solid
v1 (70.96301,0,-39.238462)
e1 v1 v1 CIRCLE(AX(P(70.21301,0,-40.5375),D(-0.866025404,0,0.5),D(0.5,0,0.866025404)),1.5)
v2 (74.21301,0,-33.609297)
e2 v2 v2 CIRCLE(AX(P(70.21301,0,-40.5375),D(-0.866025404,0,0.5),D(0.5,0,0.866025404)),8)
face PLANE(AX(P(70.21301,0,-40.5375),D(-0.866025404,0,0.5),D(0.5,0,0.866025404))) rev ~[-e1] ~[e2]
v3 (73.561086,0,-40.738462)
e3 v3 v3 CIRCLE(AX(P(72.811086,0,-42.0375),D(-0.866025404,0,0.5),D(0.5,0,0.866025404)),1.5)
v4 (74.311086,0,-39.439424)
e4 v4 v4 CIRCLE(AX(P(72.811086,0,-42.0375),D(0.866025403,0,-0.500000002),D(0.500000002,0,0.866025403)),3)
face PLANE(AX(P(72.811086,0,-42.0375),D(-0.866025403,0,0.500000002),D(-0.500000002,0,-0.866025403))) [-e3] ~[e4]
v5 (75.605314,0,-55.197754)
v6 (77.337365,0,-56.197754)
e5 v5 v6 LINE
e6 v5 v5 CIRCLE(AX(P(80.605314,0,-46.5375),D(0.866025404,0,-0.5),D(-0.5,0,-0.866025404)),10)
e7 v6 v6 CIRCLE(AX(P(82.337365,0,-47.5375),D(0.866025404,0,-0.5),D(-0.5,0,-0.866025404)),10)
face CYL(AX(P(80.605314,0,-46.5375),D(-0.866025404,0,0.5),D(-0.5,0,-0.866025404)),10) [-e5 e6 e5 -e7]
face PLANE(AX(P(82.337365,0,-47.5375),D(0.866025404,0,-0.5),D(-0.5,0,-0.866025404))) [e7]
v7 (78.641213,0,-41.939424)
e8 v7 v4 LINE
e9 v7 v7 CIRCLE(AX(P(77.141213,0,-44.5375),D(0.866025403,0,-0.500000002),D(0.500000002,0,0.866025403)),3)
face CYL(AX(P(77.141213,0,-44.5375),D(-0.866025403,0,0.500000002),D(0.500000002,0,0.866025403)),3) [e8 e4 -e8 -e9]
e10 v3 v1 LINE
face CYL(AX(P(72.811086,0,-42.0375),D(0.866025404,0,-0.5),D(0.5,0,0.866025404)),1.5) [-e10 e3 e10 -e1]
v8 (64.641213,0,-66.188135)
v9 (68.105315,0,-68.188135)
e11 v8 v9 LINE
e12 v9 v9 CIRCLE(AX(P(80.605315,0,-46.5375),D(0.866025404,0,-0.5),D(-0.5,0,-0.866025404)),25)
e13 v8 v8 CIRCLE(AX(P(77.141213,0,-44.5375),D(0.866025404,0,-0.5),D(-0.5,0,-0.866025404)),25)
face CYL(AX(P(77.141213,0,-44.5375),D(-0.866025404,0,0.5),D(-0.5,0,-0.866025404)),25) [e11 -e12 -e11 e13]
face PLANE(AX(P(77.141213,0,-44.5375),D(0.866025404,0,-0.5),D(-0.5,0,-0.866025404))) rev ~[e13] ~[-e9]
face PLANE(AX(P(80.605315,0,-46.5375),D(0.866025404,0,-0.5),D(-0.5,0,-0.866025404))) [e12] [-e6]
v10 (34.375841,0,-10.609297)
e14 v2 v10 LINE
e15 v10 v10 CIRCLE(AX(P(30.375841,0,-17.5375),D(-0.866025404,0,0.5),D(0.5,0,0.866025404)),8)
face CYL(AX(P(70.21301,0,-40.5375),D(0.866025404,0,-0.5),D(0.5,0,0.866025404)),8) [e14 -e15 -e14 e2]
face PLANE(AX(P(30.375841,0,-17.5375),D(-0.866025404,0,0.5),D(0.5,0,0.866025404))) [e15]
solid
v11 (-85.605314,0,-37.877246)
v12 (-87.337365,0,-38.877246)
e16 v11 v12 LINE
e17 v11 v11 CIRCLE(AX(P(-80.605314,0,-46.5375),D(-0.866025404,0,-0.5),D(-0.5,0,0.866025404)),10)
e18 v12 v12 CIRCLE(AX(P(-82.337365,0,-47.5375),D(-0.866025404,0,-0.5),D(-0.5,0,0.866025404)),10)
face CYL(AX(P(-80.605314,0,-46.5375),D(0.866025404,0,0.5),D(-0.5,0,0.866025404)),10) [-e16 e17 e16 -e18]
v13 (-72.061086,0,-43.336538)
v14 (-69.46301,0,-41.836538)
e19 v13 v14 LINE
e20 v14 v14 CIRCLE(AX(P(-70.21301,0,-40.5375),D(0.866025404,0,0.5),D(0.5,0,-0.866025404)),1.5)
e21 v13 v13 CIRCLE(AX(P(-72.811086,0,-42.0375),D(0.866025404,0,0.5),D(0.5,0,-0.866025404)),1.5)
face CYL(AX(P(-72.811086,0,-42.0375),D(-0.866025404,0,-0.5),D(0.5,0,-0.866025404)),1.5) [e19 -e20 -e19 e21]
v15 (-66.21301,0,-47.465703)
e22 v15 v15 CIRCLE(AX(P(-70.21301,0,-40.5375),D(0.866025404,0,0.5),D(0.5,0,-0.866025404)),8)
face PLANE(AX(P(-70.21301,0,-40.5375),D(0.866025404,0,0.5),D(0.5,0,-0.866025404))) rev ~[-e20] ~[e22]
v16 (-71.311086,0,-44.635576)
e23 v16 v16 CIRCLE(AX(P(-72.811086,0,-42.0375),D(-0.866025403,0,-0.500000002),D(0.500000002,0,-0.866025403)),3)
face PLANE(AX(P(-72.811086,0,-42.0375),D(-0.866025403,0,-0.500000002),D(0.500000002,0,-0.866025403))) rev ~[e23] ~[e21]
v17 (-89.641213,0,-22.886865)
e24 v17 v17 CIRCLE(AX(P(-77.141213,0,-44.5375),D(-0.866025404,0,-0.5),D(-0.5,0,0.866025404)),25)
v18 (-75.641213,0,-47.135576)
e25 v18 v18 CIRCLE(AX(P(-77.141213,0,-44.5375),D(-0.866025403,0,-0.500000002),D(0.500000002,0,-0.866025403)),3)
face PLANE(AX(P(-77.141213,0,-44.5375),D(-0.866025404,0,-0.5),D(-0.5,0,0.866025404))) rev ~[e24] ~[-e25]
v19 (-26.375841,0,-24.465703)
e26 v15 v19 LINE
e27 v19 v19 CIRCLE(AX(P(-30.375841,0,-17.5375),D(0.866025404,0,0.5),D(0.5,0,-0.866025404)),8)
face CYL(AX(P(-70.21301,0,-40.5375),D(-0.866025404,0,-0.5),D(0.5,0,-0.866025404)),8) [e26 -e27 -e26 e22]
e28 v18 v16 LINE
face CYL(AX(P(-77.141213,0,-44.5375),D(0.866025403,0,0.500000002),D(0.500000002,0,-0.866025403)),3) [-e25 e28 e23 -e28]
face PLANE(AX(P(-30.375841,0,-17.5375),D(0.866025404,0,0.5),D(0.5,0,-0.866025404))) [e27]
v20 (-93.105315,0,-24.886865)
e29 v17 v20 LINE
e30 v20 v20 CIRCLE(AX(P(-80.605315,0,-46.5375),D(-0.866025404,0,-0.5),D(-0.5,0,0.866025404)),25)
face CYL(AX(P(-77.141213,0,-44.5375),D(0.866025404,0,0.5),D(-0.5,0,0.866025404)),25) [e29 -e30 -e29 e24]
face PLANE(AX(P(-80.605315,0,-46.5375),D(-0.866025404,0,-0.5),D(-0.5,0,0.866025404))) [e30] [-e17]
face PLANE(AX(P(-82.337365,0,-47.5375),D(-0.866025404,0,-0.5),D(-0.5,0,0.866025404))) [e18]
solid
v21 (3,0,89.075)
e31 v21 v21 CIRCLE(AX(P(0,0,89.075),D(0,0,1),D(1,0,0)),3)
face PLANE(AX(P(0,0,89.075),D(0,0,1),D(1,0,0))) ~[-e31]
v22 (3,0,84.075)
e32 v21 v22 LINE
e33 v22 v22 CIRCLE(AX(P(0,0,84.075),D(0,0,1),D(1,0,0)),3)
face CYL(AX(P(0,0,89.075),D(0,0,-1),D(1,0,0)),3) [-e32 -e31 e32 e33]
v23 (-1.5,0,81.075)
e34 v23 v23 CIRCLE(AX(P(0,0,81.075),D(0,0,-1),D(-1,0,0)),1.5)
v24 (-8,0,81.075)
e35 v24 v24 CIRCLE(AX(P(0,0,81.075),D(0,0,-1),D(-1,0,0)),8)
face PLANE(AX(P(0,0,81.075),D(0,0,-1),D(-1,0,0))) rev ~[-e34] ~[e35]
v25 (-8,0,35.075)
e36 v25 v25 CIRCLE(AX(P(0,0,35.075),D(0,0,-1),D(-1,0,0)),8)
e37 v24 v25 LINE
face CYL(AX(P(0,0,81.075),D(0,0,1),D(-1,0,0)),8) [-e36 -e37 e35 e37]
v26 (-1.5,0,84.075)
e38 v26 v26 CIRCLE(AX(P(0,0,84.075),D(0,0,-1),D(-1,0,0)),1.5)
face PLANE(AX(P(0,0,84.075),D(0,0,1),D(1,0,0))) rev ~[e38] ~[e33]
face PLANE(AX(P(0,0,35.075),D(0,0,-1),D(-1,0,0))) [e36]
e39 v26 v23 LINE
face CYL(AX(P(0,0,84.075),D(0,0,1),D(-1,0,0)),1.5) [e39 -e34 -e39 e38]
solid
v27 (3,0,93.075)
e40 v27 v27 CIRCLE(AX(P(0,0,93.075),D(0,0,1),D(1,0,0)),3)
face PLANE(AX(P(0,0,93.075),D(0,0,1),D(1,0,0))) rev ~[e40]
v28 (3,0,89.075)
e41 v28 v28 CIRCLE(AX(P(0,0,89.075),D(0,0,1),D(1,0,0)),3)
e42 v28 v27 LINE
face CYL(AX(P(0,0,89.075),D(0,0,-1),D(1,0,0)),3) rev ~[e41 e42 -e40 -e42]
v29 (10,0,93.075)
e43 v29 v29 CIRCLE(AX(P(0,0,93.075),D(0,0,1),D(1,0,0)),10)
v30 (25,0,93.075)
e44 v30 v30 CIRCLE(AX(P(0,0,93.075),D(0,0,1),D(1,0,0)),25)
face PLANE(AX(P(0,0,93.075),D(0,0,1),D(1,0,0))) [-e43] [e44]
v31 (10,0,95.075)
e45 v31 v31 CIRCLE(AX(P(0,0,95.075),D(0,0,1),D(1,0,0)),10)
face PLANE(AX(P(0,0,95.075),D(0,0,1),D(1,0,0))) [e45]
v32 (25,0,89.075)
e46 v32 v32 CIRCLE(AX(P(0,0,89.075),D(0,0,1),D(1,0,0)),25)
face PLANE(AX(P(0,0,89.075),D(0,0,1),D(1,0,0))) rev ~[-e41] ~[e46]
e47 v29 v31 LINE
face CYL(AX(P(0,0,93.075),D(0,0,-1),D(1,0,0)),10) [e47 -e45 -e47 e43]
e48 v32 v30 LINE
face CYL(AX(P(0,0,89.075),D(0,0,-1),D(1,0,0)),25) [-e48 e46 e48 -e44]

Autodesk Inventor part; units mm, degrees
ref_plane "YZ Plane" through (0, 0, 0) normal (1, 0, 0) x (0, 1, 0)
ref_plane "XZ Plane" through (0, 0, 0) normal (0, 1, 0) x (-1, 0, 0)
ref_plane "XY Plane" through (0, 0, 0) normal (0, 0, 1) x (1, 0, 0)
sketch "Sketch1" plane through (0, 0, 0) normal (0, 1, 0) x (-1, 0, 0)
  line L0 (0, 0) -> (72.811086, -42.0375)
  line L1 (0, 0) -> (84.075, 0) construction
  line L2 (0, 0) -> (-72.811086, -42.0375)
  line L3 (0, 0) -> (84.075, 0) construction
  line L4 (0, 0) -> (0, 84.075)
  line L5 (72.811086, -42.0375) -> (77.141213, -44.5375)
  line L6 (77.141213, -44.5375) -> (75.641213, -47.135576)
  line L7 (75.641213, -47.135576) -> (71.311086, -44.635576)
  line L8 (71.311086, -44.635576) -> (72.811086, -42.0375)
  line L9 (-72.811086, -42.0375) -> (-77.141213, -44.5375)
  line L10 (-77.141213, -44.5375) -> (-78.641213, -41.939424)
  line L11 (-78.641213, -41.939424) -> (-74.311086, -39.439424)
  line L12 (-74.311086, -39.439424) -> (-72.811086, -42.0375)
  line L13 (0, 84.075) -> (0, 89.075)
  line L14 (0, 89.075) -> (-3, 89.075)
  line L15 (-3, 89.075) -> (-3, 84.075)
  line L16 (-3, 84.075) -> (0, 84.075)
  dimension "d0" = 84.075
  dimension "d1" = 30
  dimension "d2" = 84.075
  dimension "d3" = 150
  dimension "d4" = 84.075
  dimension "d5" = 5
  dimension "d6" = 3
  dimension "d7" = 3
  dimension "d8" = 5
  dimension "d9" = 3
revolve "Revolution1" add sketch "Sketch1" angle 360 about axis through (-72.811086, 0, -42.0375) along (-0.8660254, 0, -0.5) contours L5 L6 L7 L8
revolve "Revolution2" add sketch "Sketch1" angle 360 about axis through (0, 0, 84.075) along (0, 0, 1) contours L16 L15 L14 L13
revolve "Revolution3" add sketch "Sketch1" angle 360 about axis through (72.811086, 0, -42.0375) along (0.8660254, 0, -0.5) contours L9 L10 L11 L12
sketch "Sketch2" plane through (0, 0, 89.075) normal (0, 0, 1) x (1, 0, 0)
  circle A0 centre (0, 0) radius 3 projected
  circle A1 centre (0, 0) radius 25
  dimension "d13" = 50
extrude "Extrusion1" add sketch "Sketch2" along normal blind 4
sketch "Sketch3" plane through (0, 0, 93.075) normal (0, 0, 1) x (1, 0, 0)
  circle A0 centre (0, 0) radius 10
  dimension "d16" = 20
extrude "Extrusion2" add sketch "Sketch3" along normal blind 2
sketch "Sketch4" plane through (-77.141213, 0, -44.5375) normal (-0.8660254, 0, -0.5) x (-0.5, 0, 0.8660254)
  circle A0 centre (0, 0) radius 25
  dimension "d19" = 50
extrude "Extrusion3" add sketch "Sketch4" along normal blind 4
sketch "Sketch5" plane through (-80.605314, 0, -46.5375) normal (-0.8660254, 0, -0.5) x (-0.5, 0, 0.8660254)
  circle A0 centre (0, 0) radius 10
  dimension "d22" = 20
extrude "Extrusion4" add sketch "Sketch5" along normal blind 2
sketch "Sketch6" plane through (77.141213, 0, -44.5375) normal (0.8660254, 0, -0.5) x (-0.5, 0, -0.8660254)
  circle A0 centre (0, 0) radius 25
  dimension "d25" = 50
extrude "Extrusion5" add sketch "Sketch6" along normal blind 4
sketch "Sketch7" plane through (80.605314, 0, -46.5375) normal (0.8660254, 0, -0.5) x (-0.5, 0, -0.8660254)
  circle A0 centre (0, 0) radius 10
  dimension "d28" = 20
extrude "Extrusion6" add sketch "Sketch7" along normal blind 2
sketch "Sketch8" plane through (0, 0, 84.075) normal (0, 0, -1) x (-1, 0, 0)
  circle A0 centre (0, 0) radius 1.5
  dimension "d31" = 3
extrude "Extrusion7" add sketch "Sketch8" along normal blind 3
sketch "Sketch9" plane through (0, 0, 81.075) normal (0, 0, -1) x (-1, 0, 0)
  circle A0 centre (0, 0) radius 8
  dimension "d34" = 16
extrude "Extrusion8" add sketch "Sketch9" along normal blind 46
sketch "Sketch10" plane through (-72.811086, 0, -42.0375) normal (0.8660254, 0, 0.5) x (0.5, 0, -0.8660254)
  circle A0 centre (0, 0) radius 1.5
  dimension "d37" = 3
extrude "Extrusion9" add sketch "Sketch10" along normal blind 3
sketch "Sketch11" plane through (-70.21301, 0, -40.5375) normal (0.8660254, 0, 0.5) x (0.5, 0, -0.8660254)
  circle A0 centre (0, 0) radius 8
  dimension "d40" = 16
extrude "Extrusion10" add sketch "Sketch11" along normal blind 46
sketch "Sketch12" plane through (72.811086, 0, -42.0375) normal (-0.8660254, 0, 0.5) x (0.5, 0, 0.8660254)
  circle A0 centre (0, 0) radius 1.5
  dimension "d43" = 3
extrude "Extrusion11" add sketch "Sketch12" along normal blind 3
sketch "Sketch13" plane through (70.21301, 0, -40.5375) normal (-0.8660254, 0, 0.5) x (0.5, 0, 0.8660254)
  circle A0 centre (0, 0) radius 8
  dimension "d46" = 16
extrude "Extrusion12" add sketch "Sketch13" along normal blind 46
properties part number "Motors and Wheels"
